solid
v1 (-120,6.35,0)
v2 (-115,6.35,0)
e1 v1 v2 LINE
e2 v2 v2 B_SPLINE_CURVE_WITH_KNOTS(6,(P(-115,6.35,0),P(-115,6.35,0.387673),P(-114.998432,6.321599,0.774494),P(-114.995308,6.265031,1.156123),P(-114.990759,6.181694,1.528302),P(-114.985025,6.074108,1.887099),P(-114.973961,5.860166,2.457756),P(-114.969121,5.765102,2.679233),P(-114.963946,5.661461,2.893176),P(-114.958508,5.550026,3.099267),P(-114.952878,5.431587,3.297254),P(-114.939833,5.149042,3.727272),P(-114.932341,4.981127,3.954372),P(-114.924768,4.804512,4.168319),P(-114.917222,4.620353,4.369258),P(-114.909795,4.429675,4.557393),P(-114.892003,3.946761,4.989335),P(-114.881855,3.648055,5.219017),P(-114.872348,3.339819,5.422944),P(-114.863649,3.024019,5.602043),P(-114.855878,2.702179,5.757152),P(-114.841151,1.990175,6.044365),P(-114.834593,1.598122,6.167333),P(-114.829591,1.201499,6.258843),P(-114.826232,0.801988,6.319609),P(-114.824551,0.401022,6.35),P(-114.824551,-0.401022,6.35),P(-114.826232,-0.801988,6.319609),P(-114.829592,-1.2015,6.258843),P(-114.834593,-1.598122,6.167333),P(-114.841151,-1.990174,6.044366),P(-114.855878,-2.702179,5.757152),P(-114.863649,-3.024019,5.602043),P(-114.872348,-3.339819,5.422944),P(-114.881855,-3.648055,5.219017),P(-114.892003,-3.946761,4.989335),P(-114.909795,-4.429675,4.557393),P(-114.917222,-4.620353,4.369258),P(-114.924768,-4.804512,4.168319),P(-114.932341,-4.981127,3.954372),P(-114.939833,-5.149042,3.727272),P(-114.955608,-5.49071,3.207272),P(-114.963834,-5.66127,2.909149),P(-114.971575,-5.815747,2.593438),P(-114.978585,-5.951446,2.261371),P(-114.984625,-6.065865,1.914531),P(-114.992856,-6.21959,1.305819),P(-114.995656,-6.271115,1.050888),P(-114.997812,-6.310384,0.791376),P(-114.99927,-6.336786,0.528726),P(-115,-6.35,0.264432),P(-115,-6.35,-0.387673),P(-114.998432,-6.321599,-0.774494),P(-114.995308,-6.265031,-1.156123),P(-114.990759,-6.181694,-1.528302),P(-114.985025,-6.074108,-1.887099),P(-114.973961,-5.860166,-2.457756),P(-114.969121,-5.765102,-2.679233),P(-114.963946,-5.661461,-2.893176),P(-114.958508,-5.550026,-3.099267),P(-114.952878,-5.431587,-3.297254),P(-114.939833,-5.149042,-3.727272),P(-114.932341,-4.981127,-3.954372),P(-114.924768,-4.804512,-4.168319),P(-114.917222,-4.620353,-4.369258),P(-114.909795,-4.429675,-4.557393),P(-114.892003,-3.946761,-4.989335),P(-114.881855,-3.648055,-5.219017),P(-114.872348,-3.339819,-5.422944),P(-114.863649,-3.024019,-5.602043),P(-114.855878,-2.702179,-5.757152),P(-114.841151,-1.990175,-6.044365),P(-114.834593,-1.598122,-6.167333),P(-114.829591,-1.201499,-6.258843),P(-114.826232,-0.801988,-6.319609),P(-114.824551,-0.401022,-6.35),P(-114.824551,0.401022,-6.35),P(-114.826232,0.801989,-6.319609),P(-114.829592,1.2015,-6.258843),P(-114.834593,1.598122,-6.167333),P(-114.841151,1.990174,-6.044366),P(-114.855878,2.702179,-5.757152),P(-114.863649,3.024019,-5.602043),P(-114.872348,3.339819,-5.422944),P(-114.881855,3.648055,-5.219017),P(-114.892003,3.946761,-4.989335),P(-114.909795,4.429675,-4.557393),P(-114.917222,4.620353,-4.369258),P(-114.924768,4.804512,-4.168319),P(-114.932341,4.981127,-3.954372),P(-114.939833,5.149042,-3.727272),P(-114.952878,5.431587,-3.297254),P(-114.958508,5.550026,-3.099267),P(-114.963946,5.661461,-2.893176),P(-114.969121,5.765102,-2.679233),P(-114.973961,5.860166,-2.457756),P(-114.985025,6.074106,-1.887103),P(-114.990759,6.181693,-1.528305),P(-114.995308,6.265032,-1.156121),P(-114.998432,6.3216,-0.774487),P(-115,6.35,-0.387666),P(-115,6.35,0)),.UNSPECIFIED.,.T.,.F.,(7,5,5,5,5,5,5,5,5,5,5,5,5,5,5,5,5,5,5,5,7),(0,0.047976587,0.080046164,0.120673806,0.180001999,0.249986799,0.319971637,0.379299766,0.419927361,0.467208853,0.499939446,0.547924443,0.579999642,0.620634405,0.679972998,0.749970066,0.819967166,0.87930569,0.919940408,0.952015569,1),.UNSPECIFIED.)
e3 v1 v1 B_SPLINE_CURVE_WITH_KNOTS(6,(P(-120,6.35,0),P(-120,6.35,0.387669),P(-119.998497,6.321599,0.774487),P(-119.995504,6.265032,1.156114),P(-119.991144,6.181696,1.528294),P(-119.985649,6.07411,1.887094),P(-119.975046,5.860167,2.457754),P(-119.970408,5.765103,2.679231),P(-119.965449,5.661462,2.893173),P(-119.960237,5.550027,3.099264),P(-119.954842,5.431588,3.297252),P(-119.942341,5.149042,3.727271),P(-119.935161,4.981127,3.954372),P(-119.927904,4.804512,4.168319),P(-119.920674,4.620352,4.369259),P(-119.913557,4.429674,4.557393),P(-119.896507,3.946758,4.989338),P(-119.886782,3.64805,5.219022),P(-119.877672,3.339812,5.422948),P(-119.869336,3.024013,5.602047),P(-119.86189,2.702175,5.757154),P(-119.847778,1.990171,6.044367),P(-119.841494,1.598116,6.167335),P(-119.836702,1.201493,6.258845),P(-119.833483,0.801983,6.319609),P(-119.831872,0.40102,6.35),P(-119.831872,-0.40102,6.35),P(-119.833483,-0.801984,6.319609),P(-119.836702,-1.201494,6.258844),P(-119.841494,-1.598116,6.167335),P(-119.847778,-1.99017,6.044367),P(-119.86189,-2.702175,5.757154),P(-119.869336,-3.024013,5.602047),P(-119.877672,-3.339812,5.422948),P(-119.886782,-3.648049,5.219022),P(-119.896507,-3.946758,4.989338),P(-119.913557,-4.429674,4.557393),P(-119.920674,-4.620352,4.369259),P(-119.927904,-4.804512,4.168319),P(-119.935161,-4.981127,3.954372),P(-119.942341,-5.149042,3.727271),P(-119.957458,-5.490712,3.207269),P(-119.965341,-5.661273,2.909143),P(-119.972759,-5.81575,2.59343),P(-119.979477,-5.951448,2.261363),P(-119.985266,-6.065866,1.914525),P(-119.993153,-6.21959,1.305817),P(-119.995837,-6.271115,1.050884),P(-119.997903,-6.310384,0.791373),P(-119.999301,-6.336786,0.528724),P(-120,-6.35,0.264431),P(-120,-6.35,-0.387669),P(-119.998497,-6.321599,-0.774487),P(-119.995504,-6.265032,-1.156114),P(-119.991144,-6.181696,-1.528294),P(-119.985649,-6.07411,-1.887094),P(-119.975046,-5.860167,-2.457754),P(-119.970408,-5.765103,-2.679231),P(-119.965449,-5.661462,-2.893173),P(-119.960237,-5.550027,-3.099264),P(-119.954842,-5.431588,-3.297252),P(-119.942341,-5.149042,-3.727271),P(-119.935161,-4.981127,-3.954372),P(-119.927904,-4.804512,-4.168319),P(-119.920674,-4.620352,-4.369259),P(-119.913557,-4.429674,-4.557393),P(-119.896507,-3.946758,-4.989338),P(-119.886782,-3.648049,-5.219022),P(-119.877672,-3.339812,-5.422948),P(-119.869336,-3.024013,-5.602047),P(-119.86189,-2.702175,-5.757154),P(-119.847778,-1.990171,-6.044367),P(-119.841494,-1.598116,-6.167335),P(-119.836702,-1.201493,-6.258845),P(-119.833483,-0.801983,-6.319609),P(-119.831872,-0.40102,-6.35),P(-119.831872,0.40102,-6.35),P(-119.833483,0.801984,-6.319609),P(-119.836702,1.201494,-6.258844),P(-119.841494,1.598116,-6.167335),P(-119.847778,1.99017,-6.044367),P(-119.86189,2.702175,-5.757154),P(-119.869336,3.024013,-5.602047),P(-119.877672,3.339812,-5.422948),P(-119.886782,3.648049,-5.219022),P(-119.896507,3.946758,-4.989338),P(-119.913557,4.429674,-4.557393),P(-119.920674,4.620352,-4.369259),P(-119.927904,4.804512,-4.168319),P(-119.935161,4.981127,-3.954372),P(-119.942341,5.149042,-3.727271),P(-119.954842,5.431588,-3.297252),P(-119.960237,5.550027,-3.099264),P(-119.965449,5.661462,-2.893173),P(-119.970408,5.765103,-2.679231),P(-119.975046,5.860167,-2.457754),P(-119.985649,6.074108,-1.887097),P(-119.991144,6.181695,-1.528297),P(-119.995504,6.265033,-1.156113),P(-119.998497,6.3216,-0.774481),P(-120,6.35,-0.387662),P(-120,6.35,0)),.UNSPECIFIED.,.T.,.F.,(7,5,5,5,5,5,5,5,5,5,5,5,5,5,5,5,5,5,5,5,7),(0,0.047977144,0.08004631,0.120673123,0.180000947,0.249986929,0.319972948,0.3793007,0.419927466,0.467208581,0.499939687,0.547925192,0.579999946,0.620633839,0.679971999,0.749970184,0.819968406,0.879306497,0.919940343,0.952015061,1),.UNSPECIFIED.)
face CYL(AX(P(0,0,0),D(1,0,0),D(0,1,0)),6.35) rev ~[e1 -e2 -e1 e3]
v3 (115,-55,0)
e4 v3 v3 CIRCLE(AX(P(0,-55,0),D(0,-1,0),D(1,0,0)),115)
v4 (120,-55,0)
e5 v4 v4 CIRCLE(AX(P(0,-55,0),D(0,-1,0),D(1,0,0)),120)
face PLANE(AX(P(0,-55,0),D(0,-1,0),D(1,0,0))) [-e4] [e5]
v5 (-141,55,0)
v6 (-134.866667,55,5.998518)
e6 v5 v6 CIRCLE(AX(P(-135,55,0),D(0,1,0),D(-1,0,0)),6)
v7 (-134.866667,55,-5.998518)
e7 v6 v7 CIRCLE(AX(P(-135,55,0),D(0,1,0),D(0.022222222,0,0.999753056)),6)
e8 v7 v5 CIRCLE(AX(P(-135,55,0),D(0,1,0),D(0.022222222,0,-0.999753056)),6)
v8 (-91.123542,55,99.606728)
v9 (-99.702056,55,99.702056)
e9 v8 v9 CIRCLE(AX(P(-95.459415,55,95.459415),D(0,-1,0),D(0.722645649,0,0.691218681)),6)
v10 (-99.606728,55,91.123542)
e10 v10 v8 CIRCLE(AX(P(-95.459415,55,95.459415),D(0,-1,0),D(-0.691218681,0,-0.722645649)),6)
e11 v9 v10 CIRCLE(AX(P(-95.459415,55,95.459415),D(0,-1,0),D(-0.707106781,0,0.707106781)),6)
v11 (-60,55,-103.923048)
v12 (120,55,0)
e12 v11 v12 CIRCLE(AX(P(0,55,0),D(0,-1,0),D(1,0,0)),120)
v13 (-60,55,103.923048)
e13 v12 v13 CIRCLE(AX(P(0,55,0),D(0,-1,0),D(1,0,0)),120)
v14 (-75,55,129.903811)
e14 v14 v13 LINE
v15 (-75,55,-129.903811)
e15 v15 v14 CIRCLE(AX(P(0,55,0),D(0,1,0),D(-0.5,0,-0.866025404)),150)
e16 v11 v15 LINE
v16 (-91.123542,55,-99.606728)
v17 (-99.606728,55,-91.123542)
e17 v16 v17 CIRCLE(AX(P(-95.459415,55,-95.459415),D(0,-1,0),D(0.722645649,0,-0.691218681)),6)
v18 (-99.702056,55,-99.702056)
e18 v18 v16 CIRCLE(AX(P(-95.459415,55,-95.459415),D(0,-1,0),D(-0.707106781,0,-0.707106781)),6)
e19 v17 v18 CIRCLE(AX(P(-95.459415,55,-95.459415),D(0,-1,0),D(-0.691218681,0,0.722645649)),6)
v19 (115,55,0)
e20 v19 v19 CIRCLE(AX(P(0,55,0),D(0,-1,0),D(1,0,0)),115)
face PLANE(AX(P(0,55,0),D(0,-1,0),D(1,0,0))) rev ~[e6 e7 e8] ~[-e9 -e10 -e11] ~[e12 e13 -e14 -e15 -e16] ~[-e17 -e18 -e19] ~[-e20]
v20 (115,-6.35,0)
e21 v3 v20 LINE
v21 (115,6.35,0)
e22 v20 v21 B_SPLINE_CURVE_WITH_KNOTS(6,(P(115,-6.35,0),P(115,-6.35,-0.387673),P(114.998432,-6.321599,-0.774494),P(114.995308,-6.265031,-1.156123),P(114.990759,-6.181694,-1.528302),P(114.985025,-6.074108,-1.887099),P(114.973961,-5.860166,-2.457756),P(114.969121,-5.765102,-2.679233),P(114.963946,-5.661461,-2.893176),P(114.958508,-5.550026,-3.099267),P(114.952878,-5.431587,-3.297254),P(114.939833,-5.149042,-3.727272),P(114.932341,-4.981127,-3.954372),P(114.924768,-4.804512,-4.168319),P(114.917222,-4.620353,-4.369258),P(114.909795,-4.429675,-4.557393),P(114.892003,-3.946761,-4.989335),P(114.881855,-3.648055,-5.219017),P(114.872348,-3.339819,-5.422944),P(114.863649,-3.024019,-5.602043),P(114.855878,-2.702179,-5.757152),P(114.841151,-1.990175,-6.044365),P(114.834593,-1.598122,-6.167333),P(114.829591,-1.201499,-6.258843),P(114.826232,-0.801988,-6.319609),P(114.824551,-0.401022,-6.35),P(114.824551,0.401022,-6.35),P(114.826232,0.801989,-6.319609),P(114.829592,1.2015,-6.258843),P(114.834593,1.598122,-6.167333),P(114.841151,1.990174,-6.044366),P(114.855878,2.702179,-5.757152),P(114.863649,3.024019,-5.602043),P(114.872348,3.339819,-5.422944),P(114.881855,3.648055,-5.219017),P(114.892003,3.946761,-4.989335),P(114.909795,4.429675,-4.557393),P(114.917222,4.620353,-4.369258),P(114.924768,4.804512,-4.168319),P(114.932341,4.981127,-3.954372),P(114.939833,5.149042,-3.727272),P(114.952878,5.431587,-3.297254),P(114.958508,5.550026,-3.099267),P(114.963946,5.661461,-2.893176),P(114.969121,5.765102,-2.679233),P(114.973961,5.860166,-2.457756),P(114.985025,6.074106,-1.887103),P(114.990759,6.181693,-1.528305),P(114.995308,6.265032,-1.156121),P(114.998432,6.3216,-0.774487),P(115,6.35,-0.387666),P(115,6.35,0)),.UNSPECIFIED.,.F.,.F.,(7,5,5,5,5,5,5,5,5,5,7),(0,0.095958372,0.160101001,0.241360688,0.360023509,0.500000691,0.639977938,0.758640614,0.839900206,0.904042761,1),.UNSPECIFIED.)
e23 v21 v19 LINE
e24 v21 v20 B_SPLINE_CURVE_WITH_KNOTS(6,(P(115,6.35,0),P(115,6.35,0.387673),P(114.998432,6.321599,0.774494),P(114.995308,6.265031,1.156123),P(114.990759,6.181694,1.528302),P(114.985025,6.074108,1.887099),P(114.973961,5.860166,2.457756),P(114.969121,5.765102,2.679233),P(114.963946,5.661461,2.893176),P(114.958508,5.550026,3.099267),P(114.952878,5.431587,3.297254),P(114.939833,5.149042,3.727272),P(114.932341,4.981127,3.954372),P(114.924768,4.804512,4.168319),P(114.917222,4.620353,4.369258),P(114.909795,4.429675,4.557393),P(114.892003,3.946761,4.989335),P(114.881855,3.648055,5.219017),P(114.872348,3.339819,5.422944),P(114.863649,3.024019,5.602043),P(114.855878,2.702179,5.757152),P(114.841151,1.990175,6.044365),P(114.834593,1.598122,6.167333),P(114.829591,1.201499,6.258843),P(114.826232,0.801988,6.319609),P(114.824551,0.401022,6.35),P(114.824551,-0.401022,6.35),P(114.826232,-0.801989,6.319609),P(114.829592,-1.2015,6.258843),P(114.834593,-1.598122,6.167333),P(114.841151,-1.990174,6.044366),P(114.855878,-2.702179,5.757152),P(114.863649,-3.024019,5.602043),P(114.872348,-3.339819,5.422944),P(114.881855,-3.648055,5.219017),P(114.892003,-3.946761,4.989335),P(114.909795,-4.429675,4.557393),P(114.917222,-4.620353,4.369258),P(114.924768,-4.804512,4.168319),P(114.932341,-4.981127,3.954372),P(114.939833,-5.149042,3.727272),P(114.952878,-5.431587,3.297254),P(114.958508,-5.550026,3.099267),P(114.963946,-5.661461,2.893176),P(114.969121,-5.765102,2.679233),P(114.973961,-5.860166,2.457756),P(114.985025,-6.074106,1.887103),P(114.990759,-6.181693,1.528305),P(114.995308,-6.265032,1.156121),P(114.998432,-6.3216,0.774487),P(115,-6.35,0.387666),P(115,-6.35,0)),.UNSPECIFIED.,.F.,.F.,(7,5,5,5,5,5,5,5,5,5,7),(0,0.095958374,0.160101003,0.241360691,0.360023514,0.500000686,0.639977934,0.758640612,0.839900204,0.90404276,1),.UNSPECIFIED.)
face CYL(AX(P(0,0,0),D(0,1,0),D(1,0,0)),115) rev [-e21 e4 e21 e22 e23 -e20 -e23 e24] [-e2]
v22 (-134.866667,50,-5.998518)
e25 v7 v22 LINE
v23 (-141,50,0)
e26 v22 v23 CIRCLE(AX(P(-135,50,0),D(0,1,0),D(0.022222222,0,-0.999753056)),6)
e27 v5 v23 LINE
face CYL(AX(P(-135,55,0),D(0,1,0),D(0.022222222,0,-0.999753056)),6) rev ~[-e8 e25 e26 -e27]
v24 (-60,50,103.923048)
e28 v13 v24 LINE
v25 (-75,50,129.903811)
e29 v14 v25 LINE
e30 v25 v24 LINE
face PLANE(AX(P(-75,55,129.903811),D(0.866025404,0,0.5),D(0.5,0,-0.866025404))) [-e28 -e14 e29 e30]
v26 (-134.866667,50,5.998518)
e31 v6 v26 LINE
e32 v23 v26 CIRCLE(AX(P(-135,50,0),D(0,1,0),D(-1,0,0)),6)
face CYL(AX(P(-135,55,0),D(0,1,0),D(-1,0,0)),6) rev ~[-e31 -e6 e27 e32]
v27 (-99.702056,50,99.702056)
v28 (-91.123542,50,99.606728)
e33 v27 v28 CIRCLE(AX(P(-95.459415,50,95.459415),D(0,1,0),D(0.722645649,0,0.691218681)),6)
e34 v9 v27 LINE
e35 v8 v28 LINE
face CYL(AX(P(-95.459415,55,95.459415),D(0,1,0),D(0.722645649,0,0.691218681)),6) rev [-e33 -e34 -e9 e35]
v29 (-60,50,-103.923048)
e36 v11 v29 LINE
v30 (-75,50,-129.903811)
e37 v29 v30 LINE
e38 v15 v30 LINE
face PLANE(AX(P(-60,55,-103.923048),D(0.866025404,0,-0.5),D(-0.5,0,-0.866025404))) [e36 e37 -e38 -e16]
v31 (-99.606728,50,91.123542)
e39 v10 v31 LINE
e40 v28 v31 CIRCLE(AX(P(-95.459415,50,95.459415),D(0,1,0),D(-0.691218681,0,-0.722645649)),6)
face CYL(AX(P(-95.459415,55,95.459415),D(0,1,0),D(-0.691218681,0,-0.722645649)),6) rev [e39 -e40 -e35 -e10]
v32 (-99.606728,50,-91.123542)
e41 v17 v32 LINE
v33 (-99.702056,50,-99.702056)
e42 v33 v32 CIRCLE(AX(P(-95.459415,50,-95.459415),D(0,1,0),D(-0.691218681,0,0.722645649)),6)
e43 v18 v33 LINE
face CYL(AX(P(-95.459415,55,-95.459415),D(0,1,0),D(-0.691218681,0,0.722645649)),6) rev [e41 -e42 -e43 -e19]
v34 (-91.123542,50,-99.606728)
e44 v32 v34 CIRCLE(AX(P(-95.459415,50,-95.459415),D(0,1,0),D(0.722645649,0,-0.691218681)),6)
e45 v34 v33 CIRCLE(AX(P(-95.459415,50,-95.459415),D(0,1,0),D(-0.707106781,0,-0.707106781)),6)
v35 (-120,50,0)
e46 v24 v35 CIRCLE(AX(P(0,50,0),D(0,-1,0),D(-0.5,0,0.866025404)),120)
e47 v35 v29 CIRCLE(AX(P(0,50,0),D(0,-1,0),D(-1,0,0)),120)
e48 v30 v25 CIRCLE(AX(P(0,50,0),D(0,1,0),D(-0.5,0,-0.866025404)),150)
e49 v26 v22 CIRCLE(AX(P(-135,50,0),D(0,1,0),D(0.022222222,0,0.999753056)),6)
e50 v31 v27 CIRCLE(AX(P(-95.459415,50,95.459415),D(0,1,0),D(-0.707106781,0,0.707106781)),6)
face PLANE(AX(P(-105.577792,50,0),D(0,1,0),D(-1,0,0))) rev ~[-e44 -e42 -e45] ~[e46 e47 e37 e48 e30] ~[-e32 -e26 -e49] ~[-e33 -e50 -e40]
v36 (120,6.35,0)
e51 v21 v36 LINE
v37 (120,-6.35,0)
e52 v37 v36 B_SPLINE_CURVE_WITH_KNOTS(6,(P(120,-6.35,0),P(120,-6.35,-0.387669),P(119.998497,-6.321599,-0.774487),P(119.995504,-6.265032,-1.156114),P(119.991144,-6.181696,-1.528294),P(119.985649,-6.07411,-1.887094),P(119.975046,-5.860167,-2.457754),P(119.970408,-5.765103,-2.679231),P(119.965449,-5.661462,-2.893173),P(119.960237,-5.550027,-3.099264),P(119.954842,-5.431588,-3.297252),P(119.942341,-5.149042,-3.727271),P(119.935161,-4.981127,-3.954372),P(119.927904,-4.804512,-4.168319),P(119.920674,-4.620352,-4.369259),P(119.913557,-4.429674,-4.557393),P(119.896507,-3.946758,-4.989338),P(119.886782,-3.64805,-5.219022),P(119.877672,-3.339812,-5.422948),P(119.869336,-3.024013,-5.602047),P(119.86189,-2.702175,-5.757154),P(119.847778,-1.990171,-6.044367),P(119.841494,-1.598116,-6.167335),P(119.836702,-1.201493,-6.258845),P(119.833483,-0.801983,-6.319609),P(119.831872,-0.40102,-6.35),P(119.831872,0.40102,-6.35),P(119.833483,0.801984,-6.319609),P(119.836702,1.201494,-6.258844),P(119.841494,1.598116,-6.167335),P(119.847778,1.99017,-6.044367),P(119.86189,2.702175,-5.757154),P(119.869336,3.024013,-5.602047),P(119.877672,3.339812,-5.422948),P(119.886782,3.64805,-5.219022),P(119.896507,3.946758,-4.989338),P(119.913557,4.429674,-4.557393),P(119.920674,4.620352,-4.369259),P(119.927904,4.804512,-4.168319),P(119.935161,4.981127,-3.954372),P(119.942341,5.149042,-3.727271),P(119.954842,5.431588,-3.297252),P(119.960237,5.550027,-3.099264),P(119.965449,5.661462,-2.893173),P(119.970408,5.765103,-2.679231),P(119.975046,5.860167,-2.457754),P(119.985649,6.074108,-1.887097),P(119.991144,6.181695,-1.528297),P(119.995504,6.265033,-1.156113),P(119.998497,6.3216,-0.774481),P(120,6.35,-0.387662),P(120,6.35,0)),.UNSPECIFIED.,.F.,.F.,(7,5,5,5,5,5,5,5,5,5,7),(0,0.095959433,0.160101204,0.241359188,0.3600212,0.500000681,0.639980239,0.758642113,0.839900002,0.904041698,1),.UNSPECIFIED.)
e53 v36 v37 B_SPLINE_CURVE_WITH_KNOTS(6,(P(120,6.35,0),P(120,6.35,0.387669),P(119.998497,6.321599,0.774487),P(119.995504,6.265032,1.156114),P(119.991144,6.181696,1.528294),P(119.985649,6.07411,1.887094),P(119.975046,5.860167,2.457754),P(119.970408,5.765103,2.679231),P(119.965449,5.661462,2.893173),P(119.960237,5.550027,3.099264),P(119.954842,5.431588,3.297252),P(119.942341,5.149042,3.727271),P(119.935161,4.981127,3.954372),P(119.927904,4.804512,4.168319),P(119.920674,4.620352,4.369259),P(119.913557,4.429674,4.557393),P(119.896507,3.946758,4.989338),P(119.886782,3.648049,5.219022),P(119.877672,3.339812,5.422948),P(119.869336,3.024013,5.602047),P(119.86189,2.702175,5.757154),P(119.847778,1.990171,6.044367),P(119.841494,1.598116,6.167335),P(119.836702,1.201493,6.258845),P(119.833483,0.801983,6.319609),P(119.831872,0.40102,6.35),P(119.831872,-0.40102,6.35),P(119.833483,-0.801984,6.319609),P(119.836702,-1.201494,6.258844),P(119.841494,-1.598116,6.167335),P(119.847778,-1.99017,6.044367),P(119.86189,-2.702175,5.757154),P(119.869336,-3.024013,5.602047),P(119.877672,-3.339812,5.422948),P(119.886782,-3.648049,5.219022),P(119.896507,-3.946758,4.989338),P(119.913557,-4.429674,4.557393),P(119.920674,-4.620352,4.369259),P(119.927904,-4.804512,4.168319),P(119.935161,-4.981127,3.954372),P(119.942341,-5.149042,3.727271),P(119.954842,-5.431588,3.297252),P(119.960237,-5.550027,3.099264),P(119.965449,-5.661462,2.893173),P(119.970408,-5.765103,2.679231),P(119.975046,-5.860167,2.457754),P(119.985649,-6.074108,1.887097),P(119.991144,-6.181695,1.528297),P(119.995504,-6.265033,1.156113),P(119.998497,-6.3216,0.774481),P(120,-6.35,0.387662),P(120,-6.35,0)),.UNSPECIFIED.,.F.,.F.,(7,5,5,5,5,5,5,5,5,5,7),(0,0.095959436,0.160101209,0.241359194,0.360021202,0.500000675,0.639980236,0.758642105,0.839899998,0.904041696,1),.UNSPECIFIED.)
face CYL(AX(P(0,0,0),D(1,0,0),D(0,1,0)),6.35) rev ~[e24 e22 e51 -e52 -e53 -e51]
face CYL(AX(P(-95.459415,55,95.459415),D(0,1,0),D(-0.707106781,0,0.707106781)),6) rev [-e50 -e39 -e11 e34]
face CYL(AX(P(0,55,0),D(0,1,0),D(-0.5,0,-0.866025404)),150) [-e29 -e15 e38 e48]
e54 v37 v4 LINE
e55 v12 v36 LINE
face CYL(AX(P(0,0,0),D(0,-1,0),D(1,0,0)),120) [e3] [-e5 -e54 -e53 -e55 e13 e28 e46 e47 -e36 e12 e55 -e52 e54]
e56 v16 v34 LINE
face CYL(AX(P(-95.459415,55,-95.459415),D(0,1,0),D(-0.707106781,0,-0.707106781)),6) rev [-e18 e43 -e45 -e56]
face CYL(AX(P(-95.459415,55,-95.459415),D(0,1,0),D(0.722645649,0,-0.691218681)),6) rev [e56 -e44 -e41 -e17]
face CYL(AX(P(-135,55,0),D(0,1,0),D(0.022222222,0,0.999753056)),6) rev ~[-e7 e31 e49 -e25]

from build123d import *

# Parameters (mm, degrees)
F0_R     = 120
F0_R_2   = 115
F1_DEPTH = 55
F3_DEPTH = 5
F5_DEPTH = 110.001
F6_R     = 6.35
F7_DEPTH = 254


# Not quite as in the source:
# - a pattern or mirror of a feature is missing from the dataset's text; its kind, count and spacing are read off the source's solid


with BuildPart() as f1:
    # F0 (on Front) → F1 (new body, symmetric)
    with BuildSketch(Plane.XZ):
        Circle(F0_R)
        Circle(F0_R_2, mode=Mode.SUBTRACT)
    extrude(amount=F1_DEPTH, both=True)

    # F2 (on face) → F3 (join)
    with BuildSketch(Plane(origin=(0, 55, 0), x_dir=(-1, 0, 0), z_dir=(0, 1, 0))):
        with BuildLine():
            Line((60, -103.9230484541), (75, -129.9038105677))
            ThreePointArc((75, -129.9038105677), (150, 0), (75, 129.9038105677))
            Line((75, 129.9038105677), (60, 103.9230484541))
            ThreePointArc((60, 103.9230484541), (103.9230484541, 60), (120, 0))
            ThreePointArc((120, 0), (103.9230484541, -60), (60, -103.9230484541))
        make_face()
    extrude(amount=-F3_DEPTH)

    # F4 (on face) → F5 (cut, through all)
    with BuildSketch(Plane(origin=(0, 55, 0), x_dir=(-1, 0, 0), z_dir=(0, 1, 0))):
        with BuildLine():
            ThreePointArc((134.8666666667, 5.9985183356), (134.9666625504, 3), (135, 0))
            ThreePointArc((135, 0), (134.9666625504, -3), (134.8666666667, -5.9985183356))
            ThreePointArc((134.8666666667, -5.9985183356), (139.1952353927, -4.2895221179), (141, 0))
            ThreePointArc((141, 0), (139.1952353927, 4.2895221179), (134.8666666667, 5.9985183356))
        make_face()
        with BuildLine():
            ThreePointArc((134.8666666667, -5.9985183356), (134.9666625504, -3), (135, 0))
            ThreePointArc((135, 0), (134.9666625504, 3), (134.8666666667, 5.9985183356))
            ThreePointArc((134.8666666667, 5.9985183356), (129, 0), (134.8666666667, -5.9985183356))
        make_face()
    f5 = extrude(amount=-F5_DEPTH, mode=Mode.SUBTRACT)

    # F5_copies: F5 across plane
    add(f5.mirror(Plane(origin=(0, 0, 0), x_dir=(-0.9238795325, 0, -0.3826834324), z_dir=(0.3826834324, 0, -0.9238795325))), mode=Mode.SUBTRACT)

    # F5_copies1: F5 across plane
    add(f5.mirror(Plane(origin=(0, 0, 0), x_dir=(0.9238795325, 0, -0.3826834324), z_dir=(0.3826834324, 0, 0.9238795325))), mode=Mode.SUBTRACT)

    # F6 (on Right) → F7 (cut, symmetric)
    with BuildSketch(Plane.YZ):
        Circle(F6_R)
    extrude(amount=F7_DEPTH, both=True, mode=Mode.SUBTRACT)


solid = f1.part
